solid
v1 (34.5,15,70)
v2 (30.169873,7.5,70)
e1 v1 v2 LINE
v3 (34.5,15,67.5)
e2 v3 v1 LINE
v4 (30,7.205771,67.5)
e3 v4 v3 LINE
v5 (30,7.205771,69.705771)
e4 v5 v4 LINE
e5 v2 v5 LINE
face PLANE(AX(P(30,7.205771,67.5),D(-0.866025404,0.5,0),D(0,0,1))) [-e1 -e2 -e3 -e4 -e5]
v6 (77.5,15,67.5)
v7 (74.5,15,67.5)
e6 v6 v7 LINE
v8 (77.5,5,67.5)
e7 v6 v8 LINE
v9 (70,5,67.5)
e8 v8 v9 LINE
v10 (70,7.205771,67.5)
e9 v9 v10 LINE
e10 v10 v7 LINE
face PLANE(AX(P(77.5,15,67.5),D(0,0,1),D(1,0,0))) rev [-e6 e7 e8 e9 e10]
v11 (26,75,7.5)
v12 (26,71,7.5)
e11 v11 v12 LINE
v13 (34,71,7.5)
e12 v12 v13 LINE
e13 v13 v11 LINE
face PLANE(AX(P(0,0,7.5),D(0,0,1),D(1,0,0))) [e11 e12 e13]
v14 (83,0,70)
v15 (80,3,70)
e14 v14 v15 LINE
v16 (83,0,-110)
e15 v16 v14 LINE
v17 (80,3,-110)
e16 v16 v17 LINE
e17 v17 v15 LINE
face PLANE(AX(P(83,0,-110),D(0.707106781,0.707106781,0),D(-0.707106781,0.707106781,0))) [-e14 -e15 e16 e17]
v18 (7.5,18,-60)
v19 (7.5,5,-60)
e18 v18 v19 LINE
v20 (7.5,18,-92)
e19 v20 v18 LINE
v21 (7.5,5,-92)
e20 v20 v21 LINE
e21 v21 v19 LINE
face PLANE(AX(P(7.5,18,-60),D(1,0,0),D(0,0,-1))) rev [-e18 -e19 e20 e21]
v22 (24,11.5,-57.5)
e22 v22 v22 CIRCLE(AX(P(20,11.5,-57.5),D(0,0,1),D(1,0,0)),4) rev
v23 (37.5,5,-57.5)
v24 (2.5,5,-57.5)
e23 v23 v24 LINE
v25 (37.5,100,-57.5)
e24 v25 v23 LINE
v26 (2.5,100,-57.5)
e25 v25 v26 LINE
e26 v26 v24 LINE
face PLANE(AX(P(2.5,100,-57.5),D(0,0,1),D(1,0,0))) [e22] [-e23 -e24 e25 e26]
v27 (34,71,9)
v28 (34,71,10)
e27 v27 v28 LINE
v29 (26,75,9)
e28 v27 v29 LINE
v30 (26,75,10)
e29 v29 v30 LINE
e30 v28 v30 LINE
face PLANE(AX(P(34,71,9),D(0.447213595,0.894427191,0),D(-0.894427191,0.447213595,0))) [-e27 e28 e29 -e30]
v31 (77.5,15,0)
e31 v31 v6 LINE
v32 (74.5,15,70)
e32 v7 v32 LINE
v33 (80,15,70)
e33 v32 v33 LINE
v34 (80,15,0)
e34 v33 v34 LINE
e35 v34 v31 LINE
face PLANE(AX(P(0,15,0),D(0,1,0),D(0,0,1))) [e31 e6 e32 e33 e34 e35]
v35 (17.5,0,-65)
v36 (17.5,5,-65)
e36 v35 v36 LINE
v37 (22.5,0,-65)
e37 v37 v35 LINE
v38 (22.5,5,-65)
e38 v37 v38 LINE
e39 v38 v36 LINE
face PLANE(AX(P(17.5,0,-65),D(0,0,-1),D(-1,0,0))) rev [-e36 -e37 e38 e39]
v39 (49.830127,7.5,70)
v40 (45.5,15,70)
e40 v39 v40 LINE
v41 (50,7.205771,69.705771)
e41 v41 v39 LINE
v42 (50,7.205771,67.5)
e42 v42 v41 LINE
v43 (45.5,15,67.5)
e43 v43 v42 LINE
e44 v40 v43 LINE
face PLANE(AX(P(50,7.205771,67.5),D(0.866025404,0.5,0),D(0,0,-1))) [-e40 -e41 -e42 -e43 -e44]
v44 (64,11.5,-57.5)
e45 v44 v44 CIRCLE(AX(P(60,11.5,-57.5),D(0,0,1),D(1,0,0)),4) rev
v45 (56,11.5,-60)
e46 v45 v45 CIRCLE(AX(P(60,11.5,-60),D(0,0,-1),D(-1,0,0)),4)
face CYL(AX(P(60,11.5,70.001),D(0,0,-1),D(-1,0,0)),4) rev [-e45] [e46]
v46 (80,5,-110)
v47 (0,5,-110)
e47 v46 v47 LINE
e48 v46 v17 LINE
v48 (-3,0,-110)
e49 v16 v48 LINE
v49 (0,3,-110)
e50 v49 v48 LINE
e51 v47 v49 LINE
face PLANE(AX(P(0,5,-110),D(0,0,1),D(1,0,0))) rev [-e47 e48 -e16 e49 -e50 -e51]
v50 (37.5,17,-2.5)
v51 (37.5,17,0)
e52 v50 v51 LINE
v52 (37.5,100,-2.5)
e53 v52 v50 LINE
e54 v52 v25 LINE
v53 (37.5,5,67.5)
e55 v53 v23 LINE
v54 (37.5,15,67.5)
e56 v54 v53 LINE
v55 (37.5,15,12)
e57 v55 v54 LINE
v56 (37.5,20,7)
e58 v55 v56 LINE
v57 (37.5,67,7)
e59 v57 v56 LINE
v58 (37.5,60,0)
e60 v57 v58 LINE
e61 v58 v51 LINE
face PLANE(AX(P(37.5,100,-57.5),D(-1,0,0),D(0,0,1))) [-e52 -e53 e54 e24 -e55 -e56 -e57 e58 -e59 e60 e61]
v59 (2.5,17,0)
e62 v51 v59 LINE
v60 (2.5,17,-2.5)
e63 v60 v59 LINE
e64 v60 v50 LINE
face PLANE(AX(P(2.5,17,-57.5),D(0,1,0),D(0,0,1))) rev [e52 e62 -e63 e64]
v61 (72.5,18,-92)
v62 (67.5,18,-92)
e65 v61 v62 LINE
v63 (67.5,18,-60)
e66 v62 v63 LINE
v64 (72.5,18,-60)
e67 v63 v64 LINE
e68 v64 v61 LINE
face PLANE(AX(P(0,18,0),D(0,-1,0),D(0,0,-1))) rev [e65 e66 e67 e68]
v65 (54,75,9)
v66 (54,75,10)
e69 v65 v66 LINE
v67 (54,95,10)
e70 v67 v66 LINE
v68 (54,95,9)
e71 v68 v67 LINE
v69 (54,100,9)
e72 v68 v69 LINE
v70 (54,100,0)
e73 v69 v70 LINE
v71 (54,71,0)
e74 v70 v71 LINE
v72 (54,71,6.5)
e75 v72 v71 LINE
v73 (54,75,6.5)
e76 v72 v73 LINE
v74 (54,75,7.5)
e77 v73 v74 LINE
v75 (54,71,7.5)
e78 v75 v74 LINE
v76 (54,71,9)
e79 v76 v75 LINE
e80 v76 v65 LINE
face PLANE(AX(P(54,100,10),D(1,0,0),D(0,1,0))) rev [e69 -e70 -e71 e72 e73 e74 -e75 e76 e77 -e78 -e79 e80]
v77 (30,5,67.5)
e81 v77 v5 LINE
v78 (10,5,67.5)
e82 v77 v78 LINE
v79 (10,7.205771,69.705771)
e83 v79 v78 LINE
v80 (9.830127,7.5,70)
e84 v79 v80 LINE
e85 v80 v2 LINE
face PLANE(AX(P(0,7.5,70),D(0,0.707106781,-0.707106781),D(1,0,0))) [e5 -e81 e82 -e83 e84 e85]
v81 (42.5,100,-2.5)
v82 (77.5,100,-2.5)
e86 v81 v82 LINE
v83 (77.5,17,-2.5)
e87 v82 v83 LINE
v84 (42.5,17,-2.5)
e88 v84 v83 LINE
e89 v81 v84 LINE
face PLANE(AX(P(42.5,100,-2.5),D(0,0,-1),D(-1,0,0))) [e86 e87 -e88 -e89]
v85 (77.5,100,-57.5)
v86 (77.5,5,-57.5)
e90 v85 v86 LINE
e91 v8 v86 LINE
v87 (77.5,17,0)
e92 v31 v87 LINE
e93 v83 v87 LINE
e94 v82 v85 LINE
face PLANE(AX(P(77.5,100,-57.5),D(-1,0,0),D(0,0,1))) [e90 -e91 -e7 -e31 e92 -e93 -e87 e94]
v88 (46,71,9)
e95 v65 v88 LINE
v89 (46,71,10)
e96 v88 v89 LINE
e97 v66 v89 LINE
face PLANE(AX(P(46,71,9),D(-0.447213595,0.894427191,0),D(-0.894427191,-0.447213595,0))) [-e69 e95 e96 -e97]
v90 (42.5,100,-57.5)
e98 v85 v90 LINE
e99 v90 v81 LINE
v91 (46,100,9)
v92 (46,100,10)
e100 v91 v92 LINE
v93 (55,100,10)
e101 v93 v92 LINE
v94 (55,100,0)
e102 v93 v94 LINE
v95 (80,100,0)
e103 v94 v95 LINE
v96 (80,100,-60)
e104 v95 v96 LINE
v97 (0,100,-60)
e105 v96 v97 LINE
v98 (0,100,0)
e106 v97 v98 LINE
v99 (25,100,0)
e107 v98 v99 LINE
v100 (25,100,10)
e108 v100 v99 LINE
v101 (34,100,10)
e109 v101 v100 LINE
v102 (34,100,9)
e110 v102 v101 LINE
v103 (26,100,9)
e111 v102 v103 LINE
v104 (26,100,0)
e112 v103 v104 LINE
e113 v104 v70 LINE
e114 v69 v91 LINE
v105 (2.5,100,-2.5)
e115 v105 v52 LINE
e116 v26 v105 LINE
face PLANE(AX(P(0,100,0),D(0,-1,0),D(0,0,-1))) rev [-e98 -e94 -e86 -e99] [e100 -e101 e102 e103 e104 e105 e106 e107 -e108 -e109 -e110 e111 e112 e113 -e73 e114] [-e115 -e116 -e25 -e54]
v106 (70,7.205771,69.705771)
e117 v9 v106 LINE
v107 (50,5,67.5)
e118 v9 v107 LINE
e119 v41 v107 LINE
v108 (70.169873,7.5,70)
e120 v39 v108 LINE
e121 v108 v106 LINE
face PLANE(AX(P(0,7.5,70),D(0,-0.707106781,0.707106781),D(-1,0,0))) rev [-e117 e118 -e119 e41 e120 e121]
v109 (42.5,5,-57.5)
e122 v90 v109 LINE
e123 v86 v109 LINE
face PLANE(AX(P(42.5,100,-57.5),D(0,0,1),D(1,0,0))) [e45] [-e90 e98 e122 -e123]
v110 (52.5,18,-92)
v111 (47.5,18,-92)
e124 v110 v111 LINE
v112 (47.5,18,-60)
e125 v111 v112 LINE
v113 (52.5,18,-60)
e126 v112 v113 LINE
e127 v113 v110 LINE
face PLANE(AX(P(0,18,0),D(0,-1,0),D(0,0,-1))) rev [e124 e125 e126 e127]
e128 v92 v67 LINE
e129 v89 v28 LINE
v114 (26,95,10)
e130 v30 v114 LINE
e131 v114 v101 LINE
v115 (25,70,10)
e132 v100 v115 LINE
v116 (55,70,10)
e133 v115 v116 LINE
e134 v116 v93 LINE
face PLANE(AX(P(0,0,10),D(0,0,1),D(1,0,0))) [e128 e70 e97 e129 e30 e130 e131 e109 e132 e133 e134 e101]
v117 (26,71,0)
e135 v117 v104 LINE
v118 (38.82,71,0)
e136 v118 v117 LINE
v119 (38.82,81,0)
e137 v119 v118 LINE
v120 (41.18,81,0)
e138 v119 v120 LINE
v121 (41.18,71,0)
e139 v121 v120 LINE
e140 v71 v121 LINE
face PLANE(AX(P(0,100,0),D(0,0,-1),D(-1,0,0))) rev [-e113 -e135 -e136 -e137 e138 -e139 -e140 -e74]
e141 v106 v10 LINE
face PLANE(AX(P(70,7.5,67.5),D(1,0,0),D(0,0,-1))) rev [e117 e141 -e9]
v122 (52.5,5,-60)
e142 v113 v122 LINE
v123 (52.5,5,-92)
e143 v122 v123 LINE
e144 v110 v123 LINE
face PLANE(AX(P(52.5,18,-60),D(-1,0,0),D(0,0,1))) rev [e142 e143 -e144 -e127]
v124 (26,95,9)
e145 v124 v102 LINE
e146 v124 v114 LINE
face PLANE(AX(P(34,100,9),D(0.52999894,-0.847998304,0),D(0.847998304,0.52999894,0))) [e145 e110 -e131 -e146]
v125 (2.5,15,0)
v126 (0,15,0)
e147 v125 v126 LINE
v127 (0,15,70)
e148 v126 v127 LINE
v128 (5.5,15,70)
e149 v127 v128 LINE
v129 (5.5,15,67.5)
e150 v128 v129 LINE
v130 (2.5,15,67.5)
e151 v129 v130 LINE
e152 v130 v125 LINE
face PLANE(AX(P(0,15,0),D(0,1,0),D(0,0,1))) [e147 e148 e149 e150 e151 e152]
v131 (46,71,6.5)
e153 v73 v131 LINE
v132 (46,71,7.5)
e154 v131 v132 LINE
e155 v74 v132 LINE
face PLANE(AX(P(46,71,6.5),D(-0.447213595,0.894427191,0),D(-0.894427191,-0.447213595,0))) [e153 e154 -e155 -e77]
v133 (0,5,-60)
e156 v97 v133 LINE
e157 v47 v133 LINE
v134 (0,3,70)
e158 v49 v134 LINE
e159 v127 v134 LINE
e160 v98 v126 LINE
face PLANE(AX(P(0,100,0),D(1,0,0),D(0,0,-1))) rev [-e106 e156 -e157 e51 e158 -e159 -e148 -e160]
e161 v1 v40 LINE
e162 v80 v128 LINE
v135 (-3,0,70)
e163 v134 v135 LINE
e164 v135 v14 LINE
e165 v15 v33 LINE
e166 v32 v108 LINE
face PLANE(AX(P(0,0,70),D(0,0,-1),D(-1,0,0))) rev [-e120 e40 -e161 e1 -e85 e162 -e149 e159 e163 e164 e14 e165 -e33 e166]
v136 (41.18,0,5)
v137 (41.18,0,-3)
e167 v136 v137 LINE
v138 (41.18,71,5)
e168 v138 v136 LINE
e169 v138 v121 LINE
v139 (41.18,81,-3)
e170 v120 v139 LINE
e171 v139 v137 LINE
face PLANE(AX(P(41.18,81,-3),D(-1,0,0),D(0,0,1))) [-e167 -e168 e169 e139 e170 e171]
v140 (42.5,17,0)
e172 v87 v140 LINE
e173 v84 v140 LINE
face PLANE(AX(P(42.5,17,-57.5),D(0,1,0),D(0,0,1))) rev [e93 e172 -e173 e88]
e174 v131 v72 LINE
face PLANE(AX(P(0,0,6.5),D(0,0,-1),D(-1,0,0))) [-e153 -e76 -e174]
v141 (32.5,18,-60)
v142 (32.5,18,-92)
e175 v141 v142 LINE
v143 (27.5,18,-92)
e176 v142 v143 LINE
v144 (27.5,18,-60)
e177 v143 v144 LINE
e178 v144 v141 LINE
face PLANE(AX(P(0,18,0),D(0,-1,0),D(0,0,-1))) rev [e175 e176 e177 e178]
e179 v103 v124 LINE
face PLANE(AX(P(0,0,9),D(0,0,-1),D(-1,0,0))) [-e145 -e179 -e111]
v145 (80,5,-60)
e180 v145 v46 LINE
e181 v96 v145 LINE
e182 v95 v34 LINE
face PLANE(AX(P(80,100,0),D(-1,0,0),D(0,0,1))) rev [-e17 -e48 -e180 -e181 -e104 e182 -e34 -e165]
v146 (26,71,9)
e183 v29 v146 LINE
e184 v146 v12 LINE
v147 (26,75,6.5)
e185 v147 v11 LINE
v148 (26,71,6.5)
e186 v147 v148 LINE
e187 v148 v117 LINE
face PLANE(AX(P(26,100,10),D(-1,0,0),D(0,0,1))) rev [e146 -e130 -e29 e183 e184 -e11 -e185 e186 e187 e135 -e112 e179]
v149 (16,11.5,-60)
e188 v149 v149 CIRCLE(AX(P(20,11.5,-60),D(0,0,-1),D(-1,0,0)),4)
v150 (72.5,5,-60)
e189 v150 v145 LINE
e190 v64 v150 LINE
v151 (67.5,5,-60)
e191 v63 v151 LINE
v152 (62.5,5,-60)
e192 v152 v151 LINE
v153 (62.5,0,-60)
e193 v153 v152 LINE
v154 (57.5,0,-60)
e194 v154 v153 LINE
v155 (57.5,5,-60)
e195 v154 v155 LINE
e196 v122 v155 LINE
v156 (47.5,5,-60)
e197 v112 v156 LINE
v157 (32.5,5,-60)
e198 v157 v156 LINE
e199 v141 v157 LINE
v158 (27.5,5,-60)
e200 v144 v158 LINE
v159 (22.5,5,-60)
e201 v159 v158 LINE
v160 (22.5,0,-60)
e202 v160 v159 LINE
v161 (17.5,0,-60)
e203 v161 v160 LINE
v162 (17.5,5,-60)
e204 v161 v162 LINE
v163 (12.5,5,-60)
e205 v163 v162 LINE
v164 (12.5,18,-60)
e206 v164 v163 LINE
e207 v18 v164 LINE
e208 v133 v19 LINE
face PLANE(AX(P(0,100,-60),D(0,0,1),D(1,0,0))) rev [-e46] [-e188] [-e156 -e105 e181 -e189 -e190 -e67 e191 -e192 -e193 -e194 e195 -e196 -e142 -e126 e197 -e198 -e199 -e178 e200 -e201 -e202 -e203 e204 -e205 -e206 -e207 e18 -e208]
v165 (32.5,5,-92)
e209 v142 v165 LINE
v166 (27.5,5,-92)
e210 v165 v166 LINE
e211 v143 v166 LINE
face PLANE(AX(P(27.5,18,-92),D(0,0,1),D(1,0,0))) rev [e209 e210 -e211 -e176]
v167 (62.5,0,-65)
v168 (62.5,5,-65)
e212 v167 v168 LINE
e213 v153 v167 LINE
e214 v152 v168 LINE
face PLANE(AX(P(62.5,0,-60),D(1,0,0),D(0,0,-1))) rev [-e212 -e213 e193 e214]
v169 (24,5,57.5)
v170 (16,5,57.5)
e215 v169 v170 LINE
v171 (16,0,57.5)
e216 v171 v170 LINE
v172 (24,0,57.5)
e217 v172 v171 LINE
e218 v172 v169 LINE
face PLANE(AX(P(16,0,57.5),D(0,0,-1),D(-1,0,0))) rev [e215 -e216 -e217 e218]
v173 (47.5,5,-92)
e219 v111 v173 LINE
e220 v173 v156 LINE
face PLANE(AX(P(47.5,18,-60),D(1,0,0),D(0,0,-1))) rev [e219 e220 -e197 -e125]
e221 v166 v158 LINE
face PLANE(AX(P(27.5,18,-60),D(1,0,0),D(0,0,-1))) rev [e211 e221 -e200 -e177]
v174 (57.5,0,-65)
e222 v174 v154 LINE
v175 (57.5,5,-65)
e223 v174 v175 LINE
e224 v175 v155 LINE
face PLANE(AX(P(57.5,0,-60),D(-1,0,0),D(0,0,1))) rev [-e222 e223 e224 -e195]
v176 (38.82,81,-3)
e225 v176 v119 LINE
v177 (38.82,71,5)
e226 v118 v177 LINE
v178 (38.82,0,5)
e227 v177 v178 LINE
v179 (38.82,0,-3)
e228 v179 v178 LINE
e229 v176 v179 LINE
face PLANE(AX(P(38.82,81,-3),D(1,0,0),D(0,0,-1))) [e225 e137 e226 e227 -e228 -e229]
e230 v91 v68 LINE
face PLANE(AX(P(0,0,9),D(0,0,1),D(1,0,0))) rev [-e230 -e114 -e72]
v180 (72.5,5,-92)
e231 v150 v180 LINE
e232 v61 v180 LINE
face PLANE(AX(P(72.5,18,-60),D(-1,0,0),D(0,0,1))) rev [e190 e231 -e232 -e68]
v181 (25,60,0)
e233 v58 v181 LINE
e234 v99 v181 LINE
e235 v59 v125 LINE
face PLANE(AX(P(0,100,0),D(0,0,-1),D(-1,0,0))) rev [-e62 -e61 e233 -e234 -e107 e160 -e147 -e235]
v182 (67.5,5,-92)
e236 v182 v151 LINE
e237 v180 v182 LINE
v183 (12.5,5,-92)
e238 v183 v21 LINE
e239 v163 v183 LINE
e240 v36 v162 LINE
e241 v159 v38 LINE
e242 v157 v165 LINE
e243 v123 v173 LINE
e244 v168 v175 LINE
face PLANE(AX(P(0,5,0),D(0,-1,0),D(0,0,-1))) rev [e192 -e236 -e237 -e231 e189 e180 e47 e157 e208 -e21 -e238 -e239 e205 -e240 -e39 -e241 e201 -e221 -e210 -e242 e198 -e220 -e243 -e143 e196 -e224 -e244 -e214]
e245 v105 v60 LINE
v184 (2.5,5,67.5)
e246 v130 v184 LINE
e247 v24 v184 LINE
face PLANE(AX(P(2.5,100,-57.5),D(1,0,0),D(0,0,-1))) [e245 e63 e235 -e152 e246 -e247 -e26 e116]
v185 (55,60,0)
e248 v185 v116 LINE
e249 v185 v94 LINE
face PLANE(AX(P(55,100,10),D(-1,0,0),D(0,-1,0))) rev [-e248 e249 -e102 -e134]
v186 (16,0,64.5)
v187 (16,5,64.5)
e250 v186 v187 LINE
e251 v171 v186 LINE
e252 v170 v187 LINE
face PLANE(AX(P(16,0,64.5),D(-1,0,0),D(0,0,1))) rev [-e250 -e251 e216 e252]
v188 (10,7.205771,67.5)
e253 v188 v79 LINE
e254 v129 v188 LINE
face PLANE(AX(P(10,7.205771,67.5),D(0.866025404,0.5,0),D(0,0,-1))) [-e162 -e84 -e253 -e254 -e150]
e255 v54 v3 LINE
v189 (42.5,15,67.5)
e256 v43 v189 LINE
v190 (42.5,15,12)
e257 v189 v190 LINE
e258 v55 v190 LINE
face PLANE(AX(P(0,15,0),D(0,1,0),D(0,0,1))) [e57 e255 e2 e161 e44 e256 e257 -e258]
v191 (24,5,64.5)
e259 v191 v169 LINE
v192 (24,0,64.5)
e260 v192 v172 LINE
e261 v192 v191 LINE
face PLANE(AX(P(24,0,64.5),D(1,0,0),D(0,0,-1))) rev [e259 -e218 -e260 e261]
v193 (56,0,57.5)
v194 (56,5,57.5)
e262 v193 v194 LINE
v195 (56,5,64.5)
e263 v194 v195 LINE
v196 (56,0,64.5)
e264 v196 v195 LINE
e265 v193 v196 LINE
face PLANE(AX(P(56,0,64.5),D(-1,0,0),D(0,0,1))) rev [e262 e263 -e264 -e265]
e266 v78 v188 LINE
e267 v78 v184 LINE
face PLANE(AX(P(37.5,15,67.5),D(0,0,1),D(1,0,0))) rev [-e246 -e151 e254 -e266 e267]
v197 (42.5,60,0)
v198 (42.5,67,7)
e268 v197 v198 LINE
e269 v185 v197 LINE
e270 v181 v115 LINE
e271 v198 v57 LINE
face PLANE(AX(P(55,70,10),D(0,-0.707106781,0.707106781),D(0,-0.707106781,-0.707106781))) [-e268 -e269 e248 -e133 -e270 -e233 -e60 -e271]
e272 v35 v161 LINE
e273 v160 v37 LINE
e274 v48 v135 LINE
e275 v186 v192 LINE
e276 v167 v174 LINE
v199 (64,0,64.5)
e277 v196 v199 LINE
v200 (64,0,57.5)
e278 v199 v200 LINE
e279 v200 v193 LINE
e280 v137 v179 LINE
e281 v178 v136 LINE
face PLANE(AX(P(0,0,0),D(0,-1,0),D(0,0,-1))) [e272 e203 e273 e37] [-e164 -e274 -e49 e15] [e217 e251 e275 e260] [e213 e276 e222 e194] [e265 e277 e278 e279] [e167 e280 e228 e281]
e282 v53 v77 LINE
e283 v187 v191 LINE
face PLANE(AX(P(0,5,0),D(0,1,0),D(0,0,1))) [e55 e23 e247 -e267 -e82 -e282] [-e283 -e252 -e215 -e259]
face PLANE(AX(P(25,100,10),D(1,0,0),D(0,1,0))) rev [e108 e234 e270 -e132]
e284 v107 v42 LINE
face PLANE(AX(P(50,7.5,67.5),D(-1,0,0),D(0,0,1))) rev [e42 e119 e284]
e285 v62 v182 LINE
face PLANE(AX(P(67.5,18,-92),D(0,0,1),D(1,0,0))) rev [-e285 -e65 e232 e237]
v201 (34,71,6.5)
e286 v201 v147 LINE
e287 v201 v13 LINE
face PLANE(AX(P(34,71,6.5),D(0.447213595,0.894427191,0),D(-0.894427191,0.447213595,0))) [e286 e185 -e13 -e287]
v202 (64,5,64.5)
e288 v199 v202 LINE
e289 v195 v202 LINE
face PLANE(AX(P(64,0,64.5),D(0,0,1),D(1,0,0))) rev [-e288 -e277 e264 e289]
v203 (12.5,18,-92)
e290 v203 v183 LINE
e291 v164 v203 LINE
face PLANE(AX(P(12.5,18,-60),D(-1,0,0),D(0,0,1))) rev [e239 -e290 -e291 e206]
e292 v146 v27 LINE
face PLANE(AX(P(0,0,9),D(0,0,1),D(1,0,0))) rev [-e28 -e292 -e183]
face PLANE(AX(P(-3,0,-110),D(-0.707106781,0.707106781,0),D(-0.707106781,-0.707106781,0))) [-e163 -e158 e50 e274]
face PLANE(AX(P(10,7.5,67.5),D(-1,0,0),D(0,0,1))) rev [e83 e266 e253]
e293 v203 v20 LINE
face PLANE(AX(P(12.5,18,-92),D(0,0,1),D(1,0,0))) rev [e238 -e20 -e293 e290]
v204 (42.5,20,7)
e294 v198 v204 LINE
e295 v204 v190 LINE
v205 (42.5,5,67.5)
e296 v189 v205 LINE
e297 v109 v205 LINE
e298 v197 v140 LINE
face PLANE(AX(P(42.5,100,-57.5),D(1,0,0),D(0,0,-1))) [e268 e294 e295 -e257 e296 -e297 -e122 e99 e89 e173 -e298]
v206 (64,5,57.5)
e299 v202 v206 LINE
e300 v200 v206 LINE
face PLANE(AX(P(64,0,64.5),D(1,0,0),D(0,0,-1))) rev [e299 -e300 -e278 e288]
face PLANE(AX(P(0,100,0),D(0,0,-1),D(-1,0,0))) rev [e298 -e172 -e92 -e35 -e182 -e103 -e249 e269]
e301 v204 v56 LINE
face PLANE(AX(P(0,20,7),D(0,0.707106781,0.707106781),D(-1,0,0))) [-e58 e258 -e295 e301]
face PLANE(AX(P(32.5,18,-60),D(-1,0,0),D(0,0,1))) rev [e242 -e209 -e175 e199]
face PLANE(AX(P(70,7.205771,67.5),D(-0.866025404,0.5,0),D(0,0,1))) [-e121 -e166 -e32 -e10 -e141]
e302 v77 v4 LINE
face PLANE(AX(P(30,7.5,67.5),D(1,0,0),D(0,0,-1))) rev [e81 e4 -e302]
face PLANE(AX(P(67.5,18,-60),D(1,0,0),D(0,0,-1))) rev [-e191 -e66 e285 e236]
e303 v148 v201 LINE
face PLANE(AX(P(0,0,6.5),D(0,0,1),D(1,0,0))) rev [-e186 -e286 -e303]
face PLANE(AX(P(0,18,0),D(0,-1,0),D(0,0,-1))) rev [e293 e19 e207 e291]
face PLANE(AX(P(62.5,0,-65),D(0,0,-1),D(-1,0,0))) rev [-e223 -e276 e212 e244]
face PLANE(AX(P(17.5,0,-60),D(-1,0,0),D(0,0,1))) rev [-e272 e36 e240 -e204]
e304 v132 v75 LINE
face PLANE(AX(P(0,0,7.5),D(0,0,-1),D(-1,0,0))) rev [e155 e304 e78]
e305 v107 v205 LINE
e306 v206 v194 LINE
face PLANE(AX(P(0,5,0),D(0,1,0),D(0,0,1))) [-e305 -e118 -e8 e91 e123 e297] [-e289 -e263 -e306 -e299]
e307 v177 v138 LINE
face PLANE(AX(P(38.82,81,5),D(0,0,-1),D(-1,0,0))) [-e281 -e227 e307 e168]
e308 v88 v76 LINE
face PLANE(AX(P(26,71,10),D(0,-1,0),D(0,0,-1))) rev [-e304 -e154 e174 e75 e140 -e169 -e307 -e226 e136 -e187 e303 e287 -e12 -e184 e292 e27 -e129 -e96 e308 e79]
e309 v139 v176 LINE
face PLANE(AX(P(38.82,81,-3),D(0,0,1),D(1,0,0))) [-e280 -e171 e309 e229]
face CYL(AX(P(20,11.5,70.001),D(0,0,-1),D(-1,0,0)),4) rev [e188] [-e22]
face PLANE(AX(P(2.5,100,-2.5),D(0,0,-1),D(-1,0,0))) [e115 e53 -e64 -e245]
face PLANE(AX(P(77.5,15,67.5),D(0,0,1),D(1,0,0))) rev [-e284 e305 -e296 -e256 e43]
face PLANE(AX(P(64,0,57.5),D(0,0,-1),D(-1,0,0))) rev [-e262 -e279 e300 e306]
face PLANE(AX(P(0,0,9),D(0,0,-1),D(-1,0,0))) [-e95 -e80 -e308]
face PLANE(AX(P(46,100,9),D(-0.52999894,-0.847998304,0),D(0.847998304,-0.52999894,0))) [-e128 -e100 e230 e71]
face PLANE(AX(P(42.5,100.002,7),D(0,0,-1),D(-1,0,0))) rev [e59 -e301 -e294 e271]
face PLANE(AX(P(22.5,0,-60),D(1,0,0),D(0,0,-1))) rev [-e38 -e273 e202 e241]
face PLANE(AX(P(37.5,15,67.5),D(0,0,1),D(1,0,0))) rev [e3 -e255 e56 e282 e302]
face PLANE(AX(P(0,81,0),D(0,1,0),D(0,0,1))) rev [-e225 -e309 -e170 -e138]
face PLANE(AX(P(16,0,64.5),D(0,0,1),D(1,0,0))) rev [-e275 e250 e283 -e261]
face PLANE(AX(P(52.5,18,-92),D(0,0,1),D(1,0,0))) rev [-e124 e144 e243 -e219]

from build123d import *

# Parameters (mm, degrees)
SKETCH1_W                                 = 80
SKETCH1_H                                 = 60
BOSS_EXTRUDE1_DEPTH                       = 100
CUT_EXTRUDE1_START                        = 5
SKETCH2_W                                 = 35
SKETCH2_H                                 = 55
CUT_EXTRUDE1_DEPTH                        = 95
SKETCH3_W                                 = 80
SKETCH3_H                                 = 5
BOSS_EXTRUDE2_DEPTH                       = 70
BOSS_EXTRUDE3_DEPTH                       = 10
SKETCH5_W                                 = 20
SKETCH5_H                                 = 2.5
CUT_EXTRUDE2_DEPTH                        = 7.5
SKETCH6_W                                 = 35
SKETCH6_H                                 = 12
CUT_EXTRUDE4_DEPTH                        = 57.5
CUT_EXTRUDE6_REACH                        = 184.483
SKETCH7_R                                 = 4
SKETCH9_W                                 = 80
SKETCH9_H                                 = 50
BOSS_EXTRUDE4_DEPTH                       = 5
SKETCH13_W                                = 8
SKETCH13_H                                = 7
CUT_EXTRUDE8_BUTTON_HOLES_DEPTH           = 166.90660023
BOSS_EXTRUDE5_OLED_MOUNT_DEPTH            = 10
BOSS_EXTRUDE6_OLED_MOUNT_DEPTH            = 1
BOSS_EXTRUDE7_START                       = -2.5
BOSS_EXTRUDE7_OLED_MOUNT_DEPTH            = 1
BOSS_EXTRUDE8_OLED_MOUNT_DEPTH            = 1
BOSS_EXTRUDE13_OLED_MOUNT_SUPPORT_DEPTH   = 30
CUT_EXTRUDE9_OLED_CABLE_DEPTH             = 10
CUT_EXTRUDE9_OLED_CABLE_DEPTH_BACK        = 154.430766146
SKETCH18_W                                = 2.36
SKETCH18_H                                = 8
BOSS_EXTRUDE12_OLED_CABLE_GUIDE_REACH     = 162.39
SKETCH20_W                                = 5
SKETCH20_H                                = 5
CUT_EXTRUDE10_SOLENOID_WIRE_HOLE_DEPTH    = 166.90660023
SKETCH21_W                                = 5
SKETCH21_H                                = 32
BOSS_EXTRUDE9_SOLENOID_SIDE_SUPPORT_DEPTH = 13
CHAMFER3_THUMB_SIZE                       = 2.5
CHAMFER5_THUMB_SIZE                       = 4.5
CHAMFER5_THUMB_SIZE2                      = 7.794228634
CHAMFER5_THUMB_PART_2_SIZE                = 4.5
CHAMFER5_THUMB_PART_2_SIZE2               = 7.794228634
CHAMFER5_THUMB_PART_3_SIZE                = 4.5
CHAMFER5_THUMB_PART_3_SIZE2               = 7.794228634
BOSS_EXTRUDE5_GUIDE_DEPTH                 = 180
SKETCH49_W                                = 5
SKETCH49_H                                = 5
BOSS_EXTRUDE14_DEPTH                      = 5
CHAMFER8_SIZE                             = 5


with BuildPart() as part:
    # Sketch1 → Boss-Extrude1 (new body)
    with BuildSketch(Plane(origin=(0, 0, 0), x_dir=(1, 0, 0), z_dir=(0, 1, 0))):
        with Locations((40, 30)):
            Rectangle(SKETCH1_W, SKETCH1_H)
    extrude(amount=BOSS_EXTRUDE1_DEPTH)

    # Sketch2 → Cut-Extrude1 (cut)
    with BuildSketch(Plane(origin=(0, 0, 0), x_dir=(1, 0, 0), z_dir=(0, 1, 0)).offset(CUT_EXTRUDE1_START)):
        with Locations((20, 30)):
            Rectangle(SKETCH2_W, SKETCH2_H)
        with Locations((60, 30)):
            Rectangle(SKETCH2_W, SKETCH2_H)
    extrude(amount=CUT_EXTRUDE1_DEPTH, mode=Mode.SUBTRACT)

    # Sketch3 → Boss-Extrude2 (add)
    with BuildSketch(Plane.XY):
        with Locations((40, 2.5)):
            Rectangle(SKETCH3_W, SKETCH3_H)
    extrude(amount=BOSS_EXTRUDE2_DEPTH)

    # Sketch4 → Boss-Extrude3 (add)
    with BuildSketch(Plane(origin=(0, 5, 0), x_dir=(1, 0, 0), z_dir=(0, 1, 0))):
        Polygon((80, 0), (77.5, 0), (77.5, -67.5), (42.5, -67.5), (42.5, 0), (37.5, 0), (37.5, -67.5), (2.5, -67.5), (2.5, 0), (0, 0), (0, -70), (80, -70), align=None)
    extrude(amount=BOSS_EXTRUDE3_DEPTH)

    # Sketch5 → Cut-Extrude2 (cut)
    with BuildSketch(Plane(origin=(0, 15, 0), x_dir=(1, 0, 0), z_dir=(0, 1, 0))):
        with Locations((20, -68.75)):
            Rectangle(SKETCH5_W, SKETCH5_H)
        with Locations((60, -68.75)):
            Rectangle(SKETCH5_W, SKETCH5_H)
    extrude(amount=-CUT_EXTRUDE2_DEPTH, mode=Mode.SUBTRACT)

    # Sketch6 → Cut-Extrude4 (cut)
    with BuildSketch(Plane.XY):
        with Locations((20, 11)):
            Rectangle(SKETCH6_W, SKETCH6_H)
        with Locations((60, 11)):
            Rectangle(SKETCH6_W, SKETCH6_H)
    extrude(amount=-CUT_EXTRUDE4_DEPTH, mode=Mode.SUBTRACT)

    # Sketch7 → Cut-Extrude6 (cut, up to next)
    with BuildSketch(Plane(origin=(0, 0, -60), x_dir=(-1, 0, 0), z_dir=(0, 0, -1)), mode=Mode.PRIVATE) as cut_extrude6_sk1:
        with Locations((-20, 11.5)):
            Circle(SKETCH7_R)
    cut_extrude6_tool1 = extrude(cut_extrude6_sk1.sketch, amount=-CUT_EXTRUDE6_REACH, mode=Mode.PRIVATE) & part.part
    # Sketch7 → Cut-Extrude6 (cut, up to next)
    with BuildSketch(Plane(origin=(0, 0, -60), x_dir=(-1, 0, 0), z_dir=(0, 0, -1)), mode=Mode.PRIVATE) as cut_extrude6_sk2:
        with Locations((-60, 11.5)):
            Circle(SKETCH7_R)
    cut_extrude6_tool2 = extrude(cut_extrude6_sk2.sketch, amount=-CUT_EXTRUDE6_REACH, mode=Mode.PRIVATE) & part.part
    add(cut_extrude6_tool1.solids().sort_by_distance((20, 11.5, -60))[0], mode=Mode.SUBTRACT)
    add(cut_extrude6_tool2.solids().sort_by_distance((60, 11.5, -60))[0], mode=Mode.SUBTRACT)

    # Sketch9 → Boss-Extrude4 (add)
    with BuildSketch(Plane(origin=(0, 0, 0), x_dir=(1, 0, 0), z_dir=(0, 1, 0))):
        with Locations((40, 85)):
            Rectangle(SKETCH9_W, SKETCH9_H)
    extrude(amount=BOSS_EXTRUDE4_DEPTH)

    # Sketch13 → Cut-Extrude8 (Button Holes) (cut, through all)
    with BuildSketch(Plane(origin=(0, 5, 0), x_dir=(1, 0, 0), z_dir=(0, 1, 0))):
        with Locations((20, -61)):
            Rectangle(SKETCH13_W, SKETCH13_H)
        with Locations((60, -61)):
            Rectangle(SKETCH13_W, SKETCH13_H)
    extrude(amount=-CUT_EXTRUDE8_BUTTON_HOLES_DEPTH, mode=Mode.SUBTRACT)

    # Sketch14 → Boss-Extrude5 (OLED Mount) (add)
    with BuildSketch(Plane.XY):
        Polygon((25, 100), (26, 100), (26, 71), (54, 71), (54, 100), (55, 100), (55, 70), (54, 70), (26, 70), (25, 70), align=None)
    extrude(amount=BOSS_EXTRUDE5_OLED_MOUNT_DEPTH)

    # Sketch15 → Boss-Extrude6 (OLED Mount) (add)
    with BuildSketch(Plane.XY.offset(10)):
        Polygon((26, 71), (34, 71), (26, 75), align=None)
        Polygon((54, 75), (54, 71), (46, 71), align=None)
    extrude(amount=-BOSS_EXTRUDE6_OLED_MOUNT_DEPTH)

    # Sketch15<2> → Boss-Extrude7 (OLED Mount) (add)
    with BuildSketch(Plane.XY.offset(10).offset(BOSS_EXTRUDE7_START)):
        Polygon((26, 71), (34, 71), (26, 75), align=None)
        Polygon((54, 75), (54, 71), (46, 71), align=None)
    extrude(amount=-BOSS_EXTRUDE7_OLED_MOUNT_DEPTH)

    # Sketch17 → Boss-Extrude8 (OLED Mount) (add)
    with BuildSketch(Plane.XY.offset(10)):
        Polygon((54, 95), (54, 100), (46, 100), align=None)
        Polygon((26, 100), (34, 100), (26, 95), align=None)
    extrude(amount=-BOSS_EXTRUDE8_OLED_MOUNT_DEPTH)

    # Sketch32 → Boss-Extrude13 OLED Mount Support) (add)
    with BuildSketch(Plane.ZY.offset(-25)):
        Polygon((0, 70), (10, 70), (0, 60), align=None)
    extrude(amount=-BOSS_EXTRUDE13_OLED_MOUNT_SUPPORT_DEPTH)

    # Sketch18 → Cut-Extrude9 (OLED Cable) (cut, two sides: drawn at the far end of the back side and taken through both)
    with BuildSketch(Plane(origin=(0, 71, 0), x_dir=(1, 0, 0), z_dir=(0, 1, 0)).offset(-CUT_EXTRUDE9_OLED_CABLE_DEPTH_BACK)):
        with Locations((40, -1)):
            Rectangle(SKETCH18_W, SKETCH18_H)
    extrude(amount=CUT_EXTRUDE9_OLED_CABLE_DEPTH + CUT_EXTRUDE9_OLED_CABLE_DEPTH_BACK, mode=Mode.SUBTRACT)

    # Boss-Extrude12 (OLED Cable Guide): up to this plane
    boss_extrude12_oled_cable_guide_end = Plane(origin=(55, 70, 10), z_dir=(0, -0.7071067811865477, 0.7071067811865474))
    # Sketch31 → Boss-Extrude12 (OLED Cable Guide) (add, up to the surface)
    with BuildSketch(Plane(origin=(0, 15, 0), x_dir=(1, 0, 0), z_dir=(0, 1, 0)), mode=Mode.PRIVATE) as boss_extrude12_oled_cable_guide_sk1:
        Polygon((37.5, 0), (38.82, 0), (38.82, -5), (41.18, -5), (41.18, 0), (42.5, 0), (42.5, -7), (37.5, -7), align=None)
    boss_extrude12_oled_cable_guide_tool1 = split(extrude(boss_extrude12_oled_cable_guide_sk1.sketch, amount=BOSS_EXTRUDE12_OLED_CABLE_GUIDE_REACH, mode=Mode.PRIVATE), bisect_by=boss_extrude12_oled_cable_guide_end, keep=Keep.BOTH, mode=Mode.PRIVATE)
    add(boss_extrude12_oled_cable_guide_tool1.solids().sort_by_distance((38.16, 15, 0.086023))[0])

    # Sketch20 → Cut-Extrude10 (Solenoid Wire Hole) (cut, through all)
    with BuildSketch(Plane(origin=(0, 5, 0), x_dir=(1, 0, 0), z_dir=(0, 1, 0))):
        with Locations((60, 62.5)):
            Rectangle(SKETCH20_W, SKETCH20_H)
        with Locations((20, 62.5)):
            Rectangle(SKETCH20_W, SKETCH20_H)
    extrude(amount=-CUT_EXTRUDE10_SOLENOID_WIRE_HOLE_DEPTH, mode=Mode.SUBTRACT)

    # Sketch21 → Boss-Extrude9 (Solenoid Side Support) (add)
    with BuildSketch(Plane(origin=(0, 5, 0), x_dir=(1, 0, 0), z_dir=(0, 1, 0))):
        with Locations((70, 76)):
            Rectangle(SKETCH21_W, SKETCH21_H)
        with Locations((50, 76)):
            Rectangle(SKETCH21_W, SKETCH21_H)
        with Locations((30, 76)):
            Rectangle(SKETCH21_W, SKETCH21_H)
        with Locations((10, 76)):
            Rectangle(SKETCH21_W, SKETCH21_H)
    extrude(amount=BOSS_EXTRUDE9_SOLENOID_SIDE_SUPPORT_DEPTH)

    # Chamfer3 (Thumb)
    chamfer3_thumb_edges = [part.edges().sort_by_distance(p)[0] for p in [
        (20, 7.5, 67.5),
        (60, 7.5, 67.5),
    ]]
    chamfer(chamfer3_thumb_edges, length=CHAMFER3_THUMB_SIZE - 0.0001)  # a hair under: the kernel refuses the full size

    # Chamfer5 (Thumb)
    chamfer5_thumb_edges = [part.edges().sort_by_distance(p)[0] for p in [
        (70, 15, 68.75),
    ]]
    chamfer5_thumb_side = [part.faces().sort_by_distance(p)[0] for p in [
        (78.266129032, 15, 38.266129032),
    ]]
    chamfer(chamfer5_thumb_edges, length=CHAMFER5_THUMB_SIZE, length2=CHAMFER5_THUMB_SIZE2, reference=chamfer5_thumb_side[0])

    # Chamfer5 (Thumb) part 2
    chamfer5_thumb_part_2_edges = [part.edges().sort_by_distance(p)[0] for p in [
        (50, 15, 68.75),
        (30, 15, 68.75),
    ]]
    chamfer5_thumb_part_2_side = [part.faces().sort_by_distance(p)[0] for p in [
        (40, 15, 41.718085106),
    ]]
    chamfer(chamfer5_thumb_part_2_edges, length=CHAMFER5_THUMB_PART_2_SIZE, length2=CHAMFER5_THUMB_PART_2_SIZE2, reference=chamfer5_thumb_part_2_side[0])

    # Chamfer5 (Thumb) part 3
    chamfer5_thumb_part_3_edges = [part.edges().sort_by_distance(p)[0] for p in [
        (10, 15, 68.75),
    ]]
    chamfer5_thumb_part_3_side = [part.faces().sort_by_distance(p)[0] for p in [
        (1.733870968, 15, 38.266129032),
    ]]
    chamfer(chamfer5_thumb_part_3_edges, length=CHAMFER5_THUMB_PART_3_SIZE, length2=CHAMFER5_THUMB_PART_3_SIZE2, reference=chamfer5_thumb_part_3_side[0])

    # Sketch37 → Boss-Extrude5 (Guide) (add, through all)
    with BuildSketch(Plane.XY.offset(70)):
        Polygon((80, 0), (83, 0), (80, 3), align=None)
        Polygon((0, 0), (-3, 0), (0, 3), align=None)
    extrude(amount=-BOSS_EXTRUDE5_GUIDE_DEPTH)

    # Sketch49 → Boss-Extrude14 (add)
    with BuildSketch(Plane(origin=(0, 15, 0), x_dir=(1, 0, 0), z_dir=(0, 1, 0))):
        with Locations((40, -9.5)):
            Rectangle(SKETCH49_W, SKETCH49_H)
    extrude(amount=BOSS_EXTRUDE14_DEPTH)

    # Chamfer8
    chamfer8_edges = [part.edges().sort_by_distance(p)[0] for p in [
        (40, 20, 12),
    ]]
    chamfer(chamfer8_edges, length=CHAMFER8_SIZE - 0.0001)  # a hair under: the kernel refuses the full size


solid = part.part
